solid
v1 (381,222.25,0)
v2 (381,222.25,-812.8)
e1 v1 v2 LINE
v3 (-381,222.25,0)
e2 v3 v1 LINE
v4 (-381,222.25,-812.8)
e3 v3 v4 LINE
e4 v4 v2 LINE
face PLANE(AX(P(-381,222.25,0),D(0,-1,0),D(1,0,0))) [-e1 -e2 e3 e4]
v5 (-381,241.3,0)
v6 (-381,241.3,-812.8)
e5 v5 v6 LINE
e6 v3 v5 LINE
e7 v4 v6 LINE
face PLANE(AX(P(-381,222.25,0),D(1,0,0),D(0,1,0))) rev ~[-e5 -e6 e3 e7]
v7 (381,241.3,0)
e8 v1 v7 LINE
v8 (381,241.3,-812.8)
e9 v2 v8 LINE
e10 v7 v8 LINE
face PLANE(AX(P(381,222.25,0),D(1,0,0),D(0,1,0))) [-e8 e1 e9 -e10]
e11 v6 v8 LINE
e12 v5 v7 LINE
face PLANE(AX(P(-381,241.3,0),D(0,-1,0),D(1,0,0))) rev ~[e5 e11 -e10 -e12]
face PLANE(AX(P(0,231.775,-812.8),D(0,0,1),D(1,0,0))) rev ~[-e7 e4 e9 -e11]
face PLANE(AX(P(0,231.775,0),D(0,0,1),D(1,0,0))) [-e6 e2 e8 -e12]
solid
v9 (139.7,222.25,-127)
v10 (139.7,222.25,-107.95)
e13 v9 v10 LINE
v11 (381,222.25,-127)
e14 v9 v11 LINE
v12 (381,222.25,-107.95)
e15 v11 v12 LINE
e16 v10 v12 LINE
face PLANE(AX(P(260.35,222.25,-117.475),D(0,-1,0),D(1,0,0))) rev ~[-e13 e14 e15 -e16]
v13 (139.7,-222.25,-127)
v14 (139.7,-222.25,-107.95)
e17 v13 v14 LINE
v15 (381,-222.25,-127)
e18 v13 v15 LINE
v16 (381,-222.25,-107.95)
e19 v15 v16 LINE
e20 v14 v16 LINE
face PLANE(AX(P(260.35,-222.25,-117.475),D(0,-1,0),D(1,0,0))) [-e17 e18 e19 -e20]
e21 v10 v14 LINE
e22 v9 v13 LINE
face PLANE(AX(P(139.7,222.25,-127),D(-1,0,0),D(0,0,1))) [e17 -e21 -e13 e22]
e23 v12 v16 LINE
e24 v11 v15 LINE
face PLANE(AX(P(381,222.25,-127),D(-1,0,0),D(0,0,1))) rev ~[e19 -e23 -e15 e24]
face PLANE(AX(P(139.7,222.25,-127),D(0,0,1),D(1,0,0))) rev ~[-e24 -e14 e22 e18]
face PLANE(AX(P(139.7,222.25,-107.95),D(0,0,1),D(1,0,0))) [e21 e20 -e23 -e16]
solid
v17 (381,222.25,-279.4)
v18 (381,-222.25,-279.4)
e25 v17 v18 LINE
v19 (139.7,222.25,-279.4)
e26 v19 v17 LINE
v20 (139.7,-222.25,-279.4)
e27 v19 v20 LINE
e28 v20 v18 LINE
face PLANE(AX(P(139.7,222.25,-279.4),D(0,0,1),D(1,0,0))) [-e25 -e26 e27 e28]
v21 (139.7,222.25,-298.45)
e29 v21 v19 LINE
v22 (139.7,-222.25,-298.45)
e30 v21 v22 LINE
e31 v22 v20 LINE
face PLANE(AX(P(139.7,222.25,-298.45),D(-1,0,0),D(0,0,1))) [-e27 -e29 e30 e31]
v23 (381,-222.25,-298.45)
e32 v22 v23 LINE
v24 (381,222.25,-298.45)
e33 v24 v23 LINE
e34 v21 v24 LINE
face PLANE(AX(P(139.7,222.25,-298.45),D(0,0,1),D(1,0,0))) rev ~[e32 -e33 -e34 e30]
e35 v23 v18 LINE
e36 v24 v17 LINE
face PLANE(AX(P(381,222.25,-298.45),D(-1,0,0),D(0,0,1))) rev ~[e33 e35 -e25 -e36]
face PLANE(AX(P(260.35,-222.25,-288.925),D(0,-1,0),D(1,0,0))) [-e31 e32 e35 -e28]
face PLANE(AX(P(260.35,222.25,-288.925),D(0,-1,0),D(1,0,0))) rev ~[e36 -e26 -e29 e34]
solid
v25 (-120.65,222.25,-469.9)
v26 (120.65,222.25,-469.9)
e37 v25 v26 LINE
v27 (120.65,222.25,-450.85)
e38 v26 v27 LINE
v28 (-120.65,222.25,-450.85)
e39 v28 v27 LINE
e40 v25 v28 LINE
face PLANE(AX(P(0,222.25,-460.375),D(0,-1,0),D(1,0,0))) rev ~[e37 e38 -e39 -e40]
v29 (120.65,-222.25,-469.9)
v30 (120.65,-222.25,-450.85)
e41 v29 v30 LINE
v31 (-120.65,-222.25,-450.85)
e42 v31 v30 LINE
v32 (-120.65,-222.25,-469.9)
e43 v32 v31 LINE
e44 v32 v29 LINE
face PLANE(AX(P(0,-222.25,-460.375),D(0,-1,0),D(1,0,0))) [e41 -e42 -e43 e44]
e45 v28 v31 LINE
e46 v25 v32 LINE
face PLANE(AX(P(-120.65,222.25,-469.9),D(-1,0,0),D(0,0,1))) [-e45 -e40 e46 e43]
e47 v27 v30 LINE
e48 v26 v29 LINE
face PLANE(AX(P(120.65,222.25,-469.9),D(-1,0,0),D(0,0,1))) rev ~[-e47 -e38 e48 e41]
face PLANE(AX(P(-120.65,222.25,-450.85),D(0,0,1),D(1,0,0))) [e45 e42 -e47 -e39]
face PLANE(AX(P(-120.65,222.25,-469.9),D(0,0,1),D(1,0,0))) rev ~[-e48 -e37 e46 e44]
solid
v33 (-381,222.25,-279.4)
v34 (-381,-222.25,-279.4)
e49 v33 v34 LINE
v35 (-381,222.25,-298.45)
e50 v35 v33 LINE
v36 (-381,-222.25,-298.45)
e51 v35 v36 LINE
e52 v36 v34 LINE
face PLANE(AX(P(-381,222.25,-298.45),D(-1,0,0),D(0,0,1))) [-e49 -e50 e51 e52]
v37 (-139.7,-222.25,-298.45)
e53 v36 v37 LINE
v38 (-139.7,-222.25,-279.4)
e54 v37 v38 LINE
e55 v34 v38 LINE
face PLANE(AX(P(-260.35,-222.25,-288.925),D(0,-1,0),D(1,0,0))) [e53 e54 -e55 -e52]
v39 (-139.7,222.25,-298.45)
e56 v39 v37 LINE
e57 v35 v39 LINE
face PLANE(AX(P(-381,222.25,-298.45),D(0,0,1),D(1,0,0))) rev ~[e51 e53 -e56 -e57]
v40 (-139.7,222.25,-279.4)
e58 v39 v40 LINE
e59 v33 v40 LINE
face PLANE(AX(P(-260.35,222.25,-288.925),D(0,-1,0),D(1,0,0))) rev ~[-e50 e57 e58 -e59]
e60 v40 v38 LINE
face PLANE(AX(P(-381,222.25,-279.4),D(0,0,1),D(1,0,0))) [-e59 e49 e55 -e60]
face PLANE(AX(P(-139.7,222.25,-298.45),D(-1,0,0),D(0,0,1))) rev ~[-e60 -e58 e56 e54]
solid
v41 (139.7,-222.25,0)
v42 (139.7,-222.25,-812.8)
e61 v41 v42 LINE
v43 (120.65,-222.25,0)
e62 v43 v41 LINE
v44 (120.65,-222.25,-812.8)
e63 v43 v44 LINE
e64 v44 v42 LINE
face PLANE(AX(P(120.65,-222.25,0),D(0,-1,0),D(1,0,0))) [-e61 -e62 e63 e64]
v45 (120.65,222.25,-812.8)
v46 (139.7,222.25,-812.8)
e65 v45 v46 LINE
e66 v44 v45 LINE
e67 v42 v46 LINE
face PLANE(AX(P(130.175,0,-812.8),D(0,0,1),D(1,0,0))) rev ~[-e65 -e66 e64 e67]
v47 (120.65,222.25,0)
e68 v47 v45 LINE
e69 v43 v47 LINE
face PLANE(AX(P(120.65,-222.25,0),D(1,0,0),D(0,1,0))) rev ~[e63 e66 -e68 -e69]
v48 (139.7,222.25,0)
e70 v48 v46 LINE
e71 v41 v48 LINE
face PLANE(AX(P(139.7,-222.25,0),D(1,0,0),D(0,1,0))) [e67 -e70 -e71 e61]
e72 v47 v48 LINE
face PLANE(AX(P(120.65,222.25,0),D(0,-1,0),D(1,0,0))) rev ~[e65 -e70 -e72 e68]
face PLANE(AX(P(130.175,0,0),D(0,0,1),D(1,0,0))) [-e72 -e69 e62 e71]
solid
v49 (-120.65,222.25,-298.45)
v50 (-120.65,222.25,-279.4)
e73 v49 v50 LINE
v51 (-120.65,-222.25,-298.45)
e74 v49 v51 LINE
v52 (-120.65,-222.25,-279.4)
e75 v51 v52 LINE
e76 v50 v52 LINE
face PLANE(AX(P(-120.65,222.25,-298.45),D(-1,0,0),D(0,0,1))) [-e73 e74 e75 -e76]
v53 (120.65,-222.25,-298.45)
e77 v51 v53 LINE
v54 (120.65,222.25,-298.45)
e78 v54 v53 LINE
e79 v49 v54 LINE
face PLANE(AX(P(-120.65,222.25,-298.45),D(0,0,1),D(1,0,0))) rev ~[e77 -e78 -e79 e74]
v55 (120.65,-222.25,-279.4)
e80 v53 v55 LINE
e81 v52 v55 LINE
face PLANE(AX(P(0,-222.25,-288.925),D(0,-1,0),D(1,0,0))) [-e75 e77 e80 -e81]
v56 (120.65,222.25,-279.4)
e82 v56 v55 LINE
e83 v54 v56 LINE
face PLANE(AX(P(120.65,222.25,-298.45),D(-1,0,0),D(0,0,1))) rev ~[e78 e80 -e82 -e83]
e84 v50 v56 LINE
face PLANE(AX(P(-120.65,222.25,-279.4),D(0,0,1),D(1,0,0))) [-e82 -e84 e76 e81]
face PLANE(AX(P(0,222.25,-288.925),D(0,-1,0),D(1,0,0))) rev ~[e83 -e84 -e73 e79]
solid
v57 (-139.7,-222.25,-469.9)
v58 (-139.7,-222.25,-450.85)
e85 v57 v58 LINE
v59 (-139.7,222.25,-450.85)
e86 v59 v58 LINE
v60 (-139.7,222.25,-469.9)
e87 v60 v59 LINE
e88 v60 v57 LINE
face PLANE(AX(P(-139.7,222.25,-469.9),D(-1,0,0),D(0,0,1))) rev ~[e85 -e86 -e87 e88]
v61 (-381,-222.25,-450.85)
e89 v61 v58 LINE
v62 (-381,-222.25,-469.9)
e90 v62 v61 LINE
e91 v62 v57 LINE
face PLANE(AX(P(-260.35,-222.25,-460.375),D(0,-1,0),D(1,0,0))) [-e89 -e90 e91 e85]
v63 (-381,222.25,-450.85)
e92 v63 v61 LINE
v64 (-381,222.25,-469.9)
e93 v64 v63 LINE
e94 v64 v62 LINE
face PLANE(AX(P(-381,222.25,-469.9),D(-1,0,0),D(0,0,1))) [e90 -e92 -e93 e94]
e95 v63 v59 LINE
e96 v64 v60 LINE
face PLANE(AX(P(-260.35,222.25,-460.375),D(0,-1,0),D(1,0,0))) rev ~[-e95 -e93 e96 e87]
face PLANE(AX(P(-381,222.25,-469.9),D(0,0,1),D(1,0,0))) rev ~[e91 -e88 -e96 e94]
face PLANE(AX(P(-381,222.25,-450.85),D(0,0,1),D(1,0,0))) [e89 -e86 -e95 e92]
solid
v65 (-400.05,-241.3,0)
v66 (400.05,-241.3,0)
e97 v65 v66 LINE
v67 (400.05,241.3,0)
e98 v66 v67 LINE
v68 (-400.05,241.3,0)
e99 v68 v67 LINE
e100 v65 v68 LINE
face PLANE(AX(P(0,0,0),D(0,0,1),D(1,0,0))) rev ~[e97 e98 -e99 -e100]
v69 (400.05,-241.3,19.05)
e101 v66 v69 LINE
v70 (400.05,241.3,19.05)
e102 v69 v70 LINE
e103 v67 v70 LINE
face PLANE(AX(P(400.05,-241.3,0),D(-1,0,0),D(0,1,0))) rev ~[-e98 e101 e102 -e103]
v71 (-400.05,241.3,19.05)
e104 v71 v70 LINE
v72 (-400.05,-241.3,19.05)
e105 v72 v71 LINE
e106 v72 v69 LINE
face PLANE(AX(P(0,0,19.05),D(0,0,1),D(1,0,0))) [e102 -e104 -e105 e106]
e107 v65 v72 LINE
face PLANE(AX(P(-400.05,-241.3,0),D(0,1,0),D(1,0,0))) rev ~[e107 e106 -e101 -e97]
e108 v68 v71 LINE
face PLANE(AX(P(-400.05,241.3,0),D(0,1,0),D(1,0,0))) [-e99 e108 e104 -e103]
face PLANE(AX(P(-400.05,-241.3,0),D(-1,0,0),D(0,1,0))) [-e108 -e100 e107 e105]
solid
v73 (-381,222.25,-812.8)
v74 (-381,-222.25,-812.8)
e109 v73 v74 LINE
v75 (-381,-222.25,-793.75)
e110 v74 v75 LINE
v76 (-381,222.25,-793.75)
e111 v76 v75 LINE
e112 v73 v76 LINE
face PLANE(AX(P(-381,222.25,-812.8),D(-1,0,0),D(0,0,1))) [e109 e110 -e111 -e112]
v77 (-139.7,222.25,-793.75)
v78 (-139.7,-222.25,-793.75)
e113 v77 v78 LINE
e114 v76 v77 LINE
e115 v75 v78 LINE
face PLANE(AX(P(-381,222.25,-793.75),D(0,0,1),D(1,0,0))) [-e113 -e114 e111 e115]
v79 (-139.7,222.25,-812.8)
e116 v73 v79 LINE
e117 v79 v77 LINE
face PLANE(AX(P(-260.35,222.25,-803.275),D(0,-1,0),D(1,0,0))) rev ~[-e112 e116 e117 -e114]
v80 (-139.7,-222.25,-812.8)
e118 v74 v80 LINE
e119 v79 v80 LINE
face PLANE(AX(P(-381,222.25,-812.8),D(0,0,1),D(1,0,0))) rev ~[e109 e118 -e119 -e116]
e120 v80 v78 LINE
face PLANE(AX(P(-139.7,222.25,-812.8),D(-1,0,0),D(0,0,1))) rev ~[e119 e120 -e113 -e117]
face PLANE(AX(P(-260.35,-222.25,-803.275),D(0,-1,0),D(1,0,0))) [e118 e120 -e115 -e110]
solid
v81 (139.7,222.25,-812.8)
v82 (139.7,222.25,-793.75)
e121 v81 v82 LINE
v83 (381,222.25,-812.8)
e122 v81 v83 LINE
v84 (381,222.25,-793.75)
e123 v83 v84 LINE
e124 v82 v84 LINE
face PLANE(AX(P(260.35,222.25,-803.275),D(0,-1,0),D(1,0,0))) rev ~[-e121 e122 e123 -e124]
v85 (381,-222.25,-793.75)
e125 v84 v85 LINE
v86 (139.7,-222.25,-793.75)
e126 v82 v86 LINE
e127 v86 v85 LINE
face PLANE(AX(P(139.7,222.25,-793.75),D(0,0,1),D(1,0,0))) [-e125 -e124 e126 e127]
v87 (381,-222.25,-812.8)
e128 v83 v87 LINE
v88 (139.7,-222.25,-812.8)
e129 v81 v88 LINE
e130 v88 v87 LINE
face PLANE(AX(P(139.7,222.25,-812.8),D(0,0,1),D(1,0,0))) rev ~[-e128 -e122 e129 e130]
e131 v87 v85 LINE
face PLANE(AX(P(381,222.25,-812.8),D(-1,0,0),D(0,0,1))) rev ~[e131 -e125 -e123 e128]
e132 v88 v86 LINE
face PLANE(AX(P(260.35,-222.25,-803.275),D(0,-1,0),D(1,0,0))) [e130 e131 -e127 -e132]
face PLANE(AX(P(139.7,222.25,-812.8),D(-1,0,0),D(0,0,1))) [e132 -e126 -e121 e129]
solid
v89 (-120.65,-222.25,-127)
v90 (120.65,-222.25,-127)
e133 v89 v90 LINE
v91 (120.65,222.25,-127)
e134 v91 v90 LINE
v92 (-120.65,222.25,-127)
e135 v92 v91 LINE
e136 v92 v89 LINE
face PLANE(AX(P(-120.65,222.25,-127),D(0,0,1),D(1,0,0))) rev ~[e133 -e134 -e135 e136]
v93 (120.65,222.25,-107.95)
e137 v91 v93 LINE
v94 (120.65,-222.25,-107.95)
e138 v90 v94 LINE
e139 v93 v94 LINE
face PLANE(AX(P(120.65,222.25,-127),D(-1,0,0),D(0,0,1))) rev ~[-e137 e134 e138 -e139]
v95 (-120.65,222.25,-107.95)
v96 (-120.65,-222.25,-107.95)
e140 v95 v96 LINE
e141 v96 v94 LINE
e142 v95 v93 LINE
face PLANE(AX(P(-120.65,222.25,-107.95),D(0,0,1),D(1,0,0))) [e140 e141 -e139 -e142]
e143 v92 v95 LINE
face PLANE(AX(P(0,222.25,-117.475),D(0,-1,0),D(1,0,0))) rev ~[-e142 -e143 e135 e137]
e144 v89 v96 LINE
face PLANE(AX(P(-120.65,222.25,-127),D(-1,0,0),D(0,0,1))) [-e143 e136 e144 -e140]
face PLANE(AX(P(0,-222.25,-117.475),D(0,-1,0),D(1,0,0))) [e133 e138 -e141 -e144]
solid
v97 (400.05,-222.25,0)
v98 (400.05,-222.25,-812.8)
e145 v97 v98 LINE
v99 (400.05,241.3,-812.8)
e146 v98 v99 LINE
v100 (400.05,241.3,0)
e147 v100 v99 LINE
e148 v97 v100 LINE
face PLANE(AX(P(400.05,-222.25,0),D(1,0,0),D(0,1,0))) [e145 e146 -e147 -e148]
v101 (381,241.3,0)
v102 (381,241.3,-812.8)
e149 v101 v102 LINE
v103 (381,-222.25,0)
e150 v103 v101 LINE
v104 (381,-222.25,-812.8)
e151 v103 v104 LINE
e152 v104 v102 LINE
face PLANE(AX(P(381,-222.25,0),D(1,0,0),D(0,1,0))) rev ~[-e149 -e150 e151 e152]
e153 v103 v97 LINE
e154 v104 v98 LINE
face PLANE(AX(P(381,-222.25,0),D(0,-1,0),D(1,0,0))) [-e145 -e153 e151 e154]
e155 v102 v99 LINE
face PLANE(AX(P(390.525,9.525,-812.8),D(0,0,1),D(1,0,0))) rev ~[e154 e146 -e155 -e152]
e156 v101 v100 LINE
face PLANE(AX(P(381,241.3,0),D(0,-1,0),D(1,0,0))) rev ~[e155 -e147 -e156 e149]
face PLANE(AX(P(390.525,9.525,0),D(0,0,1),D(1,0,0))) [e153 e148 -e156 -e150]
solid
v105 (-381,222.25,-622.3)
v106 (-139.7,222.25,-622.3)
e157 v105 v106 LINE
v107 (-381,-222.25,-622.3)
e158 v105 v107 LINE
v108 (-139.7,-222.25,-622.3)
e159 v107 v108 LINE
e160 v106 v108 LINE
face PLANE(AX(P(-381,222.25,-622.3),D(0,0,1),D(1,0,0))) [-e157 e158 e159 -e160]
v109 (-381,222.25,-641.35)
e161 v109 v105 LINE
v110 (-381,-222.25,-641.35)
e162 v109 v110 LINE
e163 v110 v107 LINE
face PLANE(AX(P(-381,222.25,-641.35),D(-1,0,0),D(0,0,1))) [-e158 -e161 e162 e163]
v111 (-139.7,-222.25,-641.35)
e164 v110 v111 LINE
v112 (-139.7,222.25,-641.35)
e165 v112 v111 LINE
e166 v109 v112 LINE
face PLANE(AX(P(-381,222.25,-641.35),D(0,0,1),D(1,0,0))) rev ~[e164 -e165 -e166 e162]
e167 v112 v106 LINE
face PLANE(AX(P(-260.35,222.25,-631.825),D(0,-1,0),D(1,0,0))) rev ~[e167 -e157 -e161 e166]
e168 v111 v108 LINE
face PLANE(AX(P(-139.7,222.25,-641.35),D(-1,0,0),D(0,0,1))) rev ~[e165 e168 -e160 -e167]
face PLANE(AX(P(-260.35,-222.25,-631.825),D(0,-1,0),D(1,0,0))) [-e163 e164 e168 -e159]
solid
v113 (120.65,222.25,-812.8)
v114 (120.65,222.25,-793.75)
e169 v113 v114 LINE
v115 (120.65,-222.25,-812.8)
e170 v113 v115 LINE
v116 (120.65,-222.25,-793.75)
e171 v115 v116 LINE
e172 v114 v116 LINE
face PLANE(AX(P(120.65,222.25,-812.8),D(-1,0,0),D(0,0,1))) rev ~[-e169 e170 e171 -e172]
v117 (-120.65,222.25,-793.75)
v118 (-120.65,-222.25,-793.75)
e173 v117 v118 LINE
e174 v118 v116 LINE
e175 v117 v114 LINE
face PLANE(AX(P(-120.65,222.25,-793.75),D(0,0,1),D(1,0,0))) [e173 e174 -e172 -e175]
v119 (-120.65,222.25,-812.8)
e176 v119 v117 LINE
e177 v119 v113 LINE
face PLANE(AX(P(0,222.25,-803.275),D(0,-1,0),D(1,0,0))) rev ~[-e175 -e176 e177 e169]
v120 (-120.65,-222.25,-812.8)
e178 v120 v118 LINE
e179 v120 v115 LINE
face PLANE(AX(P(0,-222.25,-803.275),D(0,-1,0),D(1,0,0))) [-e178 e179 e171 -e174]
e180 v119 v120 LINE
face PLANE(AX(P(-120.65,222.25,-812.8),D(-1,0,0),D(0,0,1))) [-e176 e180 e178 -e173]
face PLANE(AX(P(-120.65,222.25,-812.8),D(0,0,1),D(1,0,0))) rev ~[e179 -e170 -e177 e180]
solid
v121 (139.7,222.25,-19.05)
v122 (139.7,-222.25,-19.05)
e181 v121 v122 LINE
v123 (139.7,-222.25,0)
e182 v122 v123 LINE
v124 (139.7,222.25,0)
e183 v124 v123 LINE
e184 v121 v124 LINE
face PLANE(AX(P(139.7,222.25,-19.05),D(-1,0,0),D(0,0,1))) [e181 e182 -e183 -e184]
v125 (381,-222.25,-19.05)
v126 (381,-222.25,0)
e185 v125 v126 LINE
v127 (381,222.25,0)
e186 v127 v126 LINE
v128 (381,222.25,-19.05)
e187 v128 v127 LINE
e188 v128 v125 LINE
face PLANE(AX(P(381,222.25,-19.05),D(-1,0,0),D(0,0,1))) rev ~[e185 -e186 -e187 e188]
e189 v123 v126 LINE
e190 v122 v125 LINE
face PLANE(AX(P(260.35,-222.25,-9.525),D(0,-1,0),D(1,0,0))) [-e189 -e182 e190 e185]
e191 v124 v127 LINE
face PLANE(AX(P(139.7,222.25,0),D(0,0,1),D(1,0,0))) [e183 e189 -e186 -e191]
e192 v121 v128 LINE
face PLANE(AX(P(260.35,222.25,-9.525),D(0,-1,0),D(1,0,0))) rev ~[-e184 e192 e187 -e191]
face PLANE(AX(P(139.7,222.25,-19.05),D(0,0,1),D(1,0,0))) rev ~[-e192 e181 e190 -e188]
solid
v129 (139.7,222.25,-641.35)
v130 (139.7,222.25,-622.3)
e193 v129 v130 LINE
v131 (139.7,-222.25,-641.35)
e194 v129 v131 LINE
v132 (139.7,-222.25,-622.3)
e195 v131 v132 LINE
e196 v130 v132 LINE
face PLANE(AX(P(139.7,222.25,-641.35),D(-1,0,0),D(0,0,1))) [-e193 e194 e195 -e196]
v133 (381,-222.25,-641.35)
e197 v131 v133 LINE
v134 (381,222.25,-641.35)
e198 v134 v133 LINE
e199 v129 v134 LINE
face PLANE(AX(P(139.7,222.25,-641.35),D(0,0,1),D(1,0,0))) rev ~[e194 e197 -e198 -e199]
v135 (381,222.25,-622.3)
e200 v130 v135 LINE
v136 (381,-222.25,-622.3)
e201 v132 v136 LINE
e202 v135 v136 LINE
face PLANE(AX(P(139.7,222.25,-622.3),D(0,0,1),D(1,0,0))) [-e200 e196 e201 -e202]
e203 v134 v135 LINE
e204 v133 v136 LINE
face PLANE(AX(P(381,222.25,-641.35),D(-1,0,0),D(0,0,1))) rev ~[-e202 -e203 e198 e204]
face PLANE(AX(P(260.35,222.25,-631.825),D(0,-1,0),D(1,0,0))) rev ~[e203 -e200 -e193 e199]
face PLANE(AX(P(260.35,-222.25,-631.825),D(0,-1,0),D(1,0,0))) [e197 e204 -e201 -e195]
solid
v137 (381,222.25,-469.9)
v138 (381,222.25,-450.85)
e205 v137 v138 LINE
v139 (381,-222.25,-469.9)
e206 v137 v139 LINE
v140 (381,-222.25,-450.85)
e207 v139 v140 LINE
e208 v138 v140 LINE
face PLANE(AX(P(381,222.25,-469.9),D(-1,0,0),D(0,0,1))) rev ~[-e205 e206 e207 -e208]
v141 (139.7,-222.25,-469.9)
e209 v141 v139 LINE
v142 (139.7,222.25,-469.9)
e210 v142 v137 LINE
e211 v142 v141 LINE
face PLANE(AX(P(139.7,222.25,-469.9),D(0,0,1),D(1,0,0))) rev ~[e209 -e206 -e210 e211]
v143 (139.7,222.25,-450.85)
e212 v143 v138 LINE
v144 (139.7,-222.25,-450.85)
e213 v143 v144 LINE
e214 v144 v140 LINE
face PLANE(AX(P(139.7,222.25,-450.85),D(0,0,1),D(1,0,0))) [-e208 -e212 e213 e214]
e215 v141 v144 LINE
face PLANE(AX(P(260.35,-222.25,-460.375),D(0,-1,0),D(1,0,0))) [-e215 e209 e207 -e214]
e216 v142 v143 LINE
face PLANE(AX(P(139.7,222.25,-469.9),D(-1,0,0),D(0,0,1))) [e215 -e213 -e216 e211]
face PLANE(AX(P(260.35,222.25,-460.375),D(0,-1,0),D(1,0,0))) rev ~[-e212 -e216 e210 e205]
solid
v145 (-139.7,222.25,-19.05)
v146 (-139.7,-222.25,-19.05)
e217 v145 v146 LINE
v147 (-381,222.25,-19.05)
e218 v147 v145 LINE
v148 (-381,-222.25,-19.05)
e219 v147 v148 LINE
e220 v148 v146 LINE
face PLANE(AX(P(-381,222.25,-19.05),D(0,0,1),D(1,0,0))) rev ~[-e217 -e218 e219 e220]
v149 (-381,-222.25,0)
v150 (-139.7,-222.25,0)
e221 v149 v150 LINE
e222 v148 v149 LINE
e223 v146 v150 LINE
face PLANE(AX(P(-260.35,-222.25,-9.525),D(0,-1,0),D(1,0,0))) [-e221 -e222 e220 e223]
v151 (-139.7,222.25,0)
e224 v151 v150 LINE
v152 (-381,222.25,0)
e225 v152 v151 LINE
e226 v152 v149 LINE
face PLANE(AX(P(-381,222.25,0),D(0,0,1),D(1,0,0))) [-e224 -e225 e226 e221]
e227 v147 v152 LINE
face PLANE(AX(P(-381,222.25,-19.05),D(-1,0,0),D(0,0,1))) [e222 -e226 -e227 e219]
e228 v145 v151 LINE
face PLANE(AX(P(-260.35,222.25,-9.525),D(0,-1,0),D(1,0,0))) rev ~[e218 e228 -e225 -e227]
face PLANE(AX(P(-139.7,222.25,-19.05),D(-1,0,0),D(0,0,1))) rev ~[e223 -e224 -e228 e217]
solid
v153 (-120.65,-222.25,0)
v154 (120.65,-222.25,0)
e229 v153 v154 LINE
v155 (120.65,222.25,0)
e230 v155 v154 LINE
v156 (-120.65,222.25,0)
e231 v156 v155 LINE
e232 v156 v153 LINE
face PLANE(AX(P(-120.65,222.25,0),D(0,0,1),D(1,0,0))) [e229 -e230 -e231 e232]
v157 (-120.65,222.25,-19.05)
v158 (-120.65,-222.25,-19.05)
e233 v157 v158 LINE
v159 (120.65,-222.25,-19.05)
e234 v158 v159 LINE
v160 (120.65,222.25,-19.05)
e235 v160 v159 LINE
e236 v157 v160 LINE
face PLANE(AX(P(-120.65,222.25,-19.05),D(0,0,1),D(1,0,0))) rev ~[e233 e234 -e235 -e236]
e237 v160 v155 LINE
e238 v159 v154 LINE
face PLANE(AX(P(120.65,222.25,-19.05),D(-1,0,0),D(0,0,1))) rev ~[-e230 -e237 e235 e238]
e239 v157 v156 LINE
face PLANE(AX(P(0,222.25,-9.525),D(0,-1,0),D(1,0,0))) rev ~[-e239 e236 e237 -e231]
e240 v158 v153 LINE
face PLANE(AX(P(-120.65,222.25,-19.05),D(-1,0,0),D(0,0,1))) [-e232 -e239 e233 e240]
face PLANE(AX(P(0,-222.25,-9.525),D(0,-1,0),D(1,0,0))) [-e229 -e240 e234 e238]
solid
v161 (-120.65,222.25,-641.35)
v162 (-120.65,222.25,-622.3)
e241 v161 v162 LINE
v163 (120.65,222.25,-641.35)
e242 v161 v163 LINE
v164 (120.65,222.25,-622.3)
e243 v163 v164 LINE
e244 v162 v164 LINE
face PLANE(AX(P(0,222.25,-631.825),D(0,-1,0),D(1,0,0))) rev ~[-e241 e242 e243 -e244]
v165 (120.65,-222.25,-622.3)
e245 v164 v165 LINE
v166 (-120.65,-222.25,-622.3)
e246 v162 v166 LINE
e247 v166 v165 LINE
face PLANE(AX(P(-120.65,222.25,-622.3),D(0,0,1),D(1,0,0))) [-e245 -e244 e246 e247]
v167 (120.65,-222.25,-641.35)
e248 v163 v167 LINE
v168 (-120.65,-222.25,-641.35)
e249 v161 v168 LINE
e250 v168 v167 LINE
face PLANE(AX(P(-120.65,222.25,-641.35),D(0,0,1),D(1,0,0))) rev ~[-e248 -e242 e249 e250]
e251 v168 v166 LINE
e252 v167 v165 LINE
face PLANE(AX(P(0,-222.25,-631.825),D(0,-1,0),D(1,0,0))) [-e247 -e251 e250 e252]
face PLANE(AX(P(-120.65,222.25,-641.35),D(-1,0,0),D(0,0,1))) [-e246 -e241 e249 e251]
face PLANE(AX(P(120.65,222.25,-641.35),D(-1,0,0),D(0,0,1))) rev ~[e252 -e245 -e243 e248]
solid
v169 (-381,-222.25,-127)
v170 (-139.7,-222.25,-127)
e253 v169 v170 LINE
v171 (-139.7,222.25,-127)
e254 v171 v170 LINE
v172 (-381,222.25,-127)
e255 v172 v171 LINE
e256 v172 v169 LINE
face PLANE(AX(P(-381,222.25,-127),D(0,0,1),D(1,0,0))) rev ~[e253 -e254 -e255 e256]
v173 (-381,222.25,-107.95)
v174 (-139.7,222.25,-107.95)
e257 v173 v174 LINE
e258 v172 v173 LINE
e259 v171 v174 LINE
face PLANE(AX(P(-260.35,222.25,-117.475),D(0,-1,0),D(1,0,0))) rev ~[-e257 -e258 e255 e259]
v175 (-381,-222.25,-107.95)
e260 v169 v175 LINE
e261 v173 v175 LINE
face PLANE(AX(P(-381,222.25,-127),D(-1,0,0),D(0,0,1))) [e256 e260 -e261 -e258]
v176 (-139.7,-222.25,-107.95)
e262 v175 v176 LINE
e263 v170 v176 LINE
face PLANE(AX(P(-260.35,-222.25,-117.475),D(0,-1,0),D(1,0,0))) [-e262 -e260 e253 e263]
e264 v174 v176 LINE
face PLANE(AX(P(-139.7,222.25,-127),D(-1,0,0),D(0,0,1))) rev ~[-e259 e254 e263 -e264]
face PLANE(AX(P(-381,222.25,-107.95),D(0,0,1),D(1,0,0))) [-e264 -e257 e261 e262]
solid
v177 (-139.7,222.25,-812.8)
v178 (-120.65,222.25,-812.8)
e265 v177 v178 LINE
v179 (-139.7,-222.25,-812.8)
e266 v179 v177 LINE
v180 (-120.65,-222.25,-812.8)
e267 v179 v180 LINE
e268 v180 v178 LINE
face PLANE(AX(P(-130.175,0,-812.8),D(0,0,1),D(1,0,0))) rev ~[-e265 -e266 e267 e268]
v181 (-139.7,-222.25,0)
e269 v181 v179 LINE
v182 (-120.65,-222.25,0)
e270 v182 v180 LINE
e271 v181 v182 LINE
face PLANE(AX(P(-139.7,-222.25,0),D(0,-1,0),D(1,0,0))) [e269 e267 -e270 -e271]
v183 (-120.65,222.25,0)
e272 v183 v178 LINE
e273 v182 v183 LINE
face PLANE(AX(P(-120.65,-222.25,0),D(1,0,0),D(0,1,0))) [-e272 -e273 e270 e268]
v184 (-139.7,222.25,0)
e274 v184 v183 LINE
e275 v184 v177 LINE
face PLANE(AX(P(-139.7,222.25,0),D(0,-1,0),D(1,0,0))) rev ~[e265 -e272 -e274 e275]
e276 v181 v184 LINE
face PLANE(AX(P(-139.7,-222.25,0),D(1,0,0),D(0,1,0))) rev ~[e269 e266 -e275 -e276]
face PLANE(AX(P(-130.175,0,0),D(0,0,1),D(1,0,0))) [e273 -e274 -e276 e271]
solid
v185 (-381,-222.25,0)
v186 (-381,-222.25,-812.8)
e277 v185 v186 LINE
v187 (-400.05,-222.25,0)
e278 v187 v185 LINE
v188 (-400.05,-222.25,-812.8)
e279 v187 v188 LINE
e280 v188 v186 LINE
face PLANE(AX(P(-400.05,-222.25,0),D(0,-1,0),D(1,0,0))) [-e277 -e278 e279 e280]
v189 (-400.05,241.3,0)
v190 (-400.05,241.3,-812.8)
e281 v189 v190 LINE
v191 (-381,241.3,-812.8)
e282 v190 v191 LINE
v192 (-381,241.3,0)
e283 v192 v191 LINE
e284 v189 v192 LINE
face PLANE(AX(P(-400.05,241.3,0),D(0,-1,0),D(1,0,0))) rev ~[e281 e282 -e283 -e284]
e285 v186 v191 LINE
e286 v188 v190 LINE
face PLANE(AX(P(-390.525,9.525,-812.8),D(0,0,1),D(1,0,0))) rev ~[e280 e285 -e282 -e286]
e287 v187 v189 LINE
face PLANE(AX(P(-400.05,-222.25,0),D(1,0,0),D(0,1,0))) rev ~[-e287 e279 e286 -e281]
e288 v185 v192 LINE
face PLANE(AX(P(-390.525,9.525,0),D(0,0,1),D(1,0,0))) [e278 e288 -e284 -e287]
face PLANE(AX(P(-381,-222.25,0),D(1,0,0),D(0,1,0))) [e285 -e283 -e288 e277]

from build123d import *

# Parameters (mm, degrees)
F1_W      = 800.1
F1_H      = 482.6
F2_DEPTH  = 19.05
F3_W      = 19.05
F3_H      = 463.55
F4_DEPTH  = 812.8
F5_W      = 762
F5_H      = 19.05
F6_DEPTH  = 812.8
F7_W      = 19.05
F7_H      = 444.5
F8_DEPTH  = 812.8
F9_W      = 241.3
F9_H      = 19.05
F10_DEPTH = 444.5


# Not quite as in the source:
# - a variable given as a bare number and used for a length is read in inches; the dataset says mm whatever the document's units were


with BuildPart() as f2:
    # F1 (on Top) → F2 (new body)
    with BuildSketch(Plane.XY):
        Rectangle(F1_W, F1_H)
    extrude(amount=F2_DEPTH)


with BuildPart() as f4:
    # F3 (on face) → F4 (new body)
    with BuildSketch(Plane.XY):
        with Locations((-390.525, 9.525)):
            Rectangle(F3_W, F3_H)
    extrude(amount=-F4_DEPTH)


with BuildPart() as f4b:
    # F3 (on face) → F4, piece 2 (new body)
    with BuildSketch(Plane.XY):
        with Locations((390.525, 9.525)):
            Rectangle(F3_W, F3_H)
    extrude(amount=-F4_DEPTH)


with BuildPart() as f6:
    # F5 (on face) → F6 (new body)
    with BuildSketch(Plane.XY):
        with Locations((0, 231.775)):
            Rectangle(F5_W, F5_H)
    extrude(amount=-F6_DEPTH)


with BuildPart() as f8:
    # F7 (on face) → F8 (new body)
    with BuildSketch(Plane.XY):
        with Locations((-130.175, 0)):
            Rectangle(F7_W, F7_H)
    extrude(amount=-F8_DEPTH)


with BuildPart() as f8b:
    # F7 (on face) → F8, piece 2 (new body)
    with BuildSketch(Plane.XY):
        with Locations((130.175, 0)):
            Rectangle(F7_W, F7_H)
    extrude(amount=-F8_DEPTH)


with BuildPart() as f10:
    # F9 (on face) → F10 (new body, through all)
    with BuildSketch(Plane.XZ.offset(-222.25)):
        with Locations((-260.35, -9.525)):
            Rectangle(F9_W, F9_H)
    extrude(amount=F10_DEPTH)


with BuildPart() as f10b:
    # F9 (on face) → F10, piece 2 (new body, through all)
    with BuildSketch(Plane.XZ.offset(-222.25)):
        with Locations((260.35, -9.525)):
            Rectangle(F9_W, F9_H)
    extrude(amount=F10_DEPTH)


with BuildPart() as f10c:
    # F9 (on face) → F10, piece 3 (new body, through all)
    with BuildSketch(Plane.XZ.offset(-222.25)):
        with Locations((0, -9.525)):
            Rectangle(F9_W, F9_H)
    extrude(amount=F10_DEPTH)


with BuildPart() as f10d:
    # F9 (on face) → F10, piece 4 (new body, through all)
    with BuildSketch(Plane.XZ.offset(-222.25)):
        with Locations((-260.35, -803.275)):
            Rectangle(F9_W, F9_H)
    extrude(amount=F10_DEPTH)


with BuildPart() as f10e:
    # F9 (on face) → F10, piece 5 (new body, through all)
    with BuildSketch(Plane.XZ.offset(-222.25)):
        with Locations((260.35, -803.275)):
            Rectangle(F9_W, F9_H)
    extrude(amount=F10_DEPTH)


with BuildPart() as f10f:
    # F9 (on face) → F10, piece 6 (new body, through all)
    with BuildSketch(Plane.XZ.offset(-222.25)):
        with Locations((0, -803.275)):
            Rectangle(F9_W, F9_H)
    extrude(amount=F10_DEPTH)


with BuildPart() as f10g:
    # F9 (on face) → F10, piece 7 (new body, through all)
    with BuildSketch(Plane.XZ.offset(-222.25)):
        with Locations((260.35, -631.825)):
            Rectangle(F9_W, F9_H)
    extrude(amount=F10_DEPTH)


with BuildPart() as f10h:
    # F9 (on face) → F10, piece 8 (new body, through all)
    with BuildSketch(Plane.XZ.offset(-222.25)):
        with Locations((-260.35, -631.825)):
            Rectangle(F9_W, F9_H)
    extrude(amount=F10_DEPTH)


with BuildPart() as f10i:
    # F9 (on face) → F10, piece 9 (new body, through all)
    with BuildSketch(Plane.XZ.offset(-222.25)):
        with Locations((0, -631.825)):
            Rectangle(F9_W, F9_H)
    extrude(amount=F10_DEPTH)


with BuildPart() as f10j:
    # F9 (on face) → F10, piece 10 (new body, through all)
    with BuildSketch(Plane.XZ.offset(-222.25)):
        with Locations((260.35, -460.375)):
            Rectangle(F9_W, F9_H)
    extrude(amount=F10_DEPTH)


with BuildPart() as f10k:
    # F9 (on face) → F10, piece 11 (new body, through all)
    with BuildSketch(Plane.XZ.offset(-222.25)):
        with Locations((-260.35, -460.375)):
            Rectangle(F9_W, F9_H)
    extrude(amount=F10_DEPTH)


with BuildPart() as f10l:
    # F9 (on face) → F10, piece 12 (new body, through all)
    with BuildSketch(Plane.XZ.offset(-222.25)):
        with Locations((0, -460.375)):
            Rectangle(F9_W, F9_H)
    extrude(amount=F10_DEPTH)


with BuildPart() as f10m:
    # F9 (on face) → F10, piece 13 (new body, through all)
    with BuildSketch(Plane.XZ.offset(-222.25)):
        with Locations((260.35, -288.925)):
            Rectangle(F9_W, F9_H)
    extrude(amount=F10_DEPTH)


with BuildPart() as f10n:
    # F9 (on face) → F10, piece 14 (new body, through all)
    with BuildSketch(Plane.XZ.offset(-222.25)):
        with Locations((-260.35, -288.925)):
            Rectangle(F9_W, F9_H)
    extrude(amount=F10_DEPTH)


with BuildPart() as f10o:
    # F9 (on face) → F10, piece 15 (new body, through all)
    with BuildSketch(Plane.XZ.offset(-222.25)):
        with Locations((0, -288.925)):
            Rectangle(F9_W, F9_H)
    extrude(amount=F10_DEPTH)


with BuildPart() as f10p:
    # F9 (on face) → F10, piece 16 (new body, through all)
    with BuildSketch(Plane.XZ.offset(-222.25)):
        with Locations((260.35, -117.475)):
            Rectangle(F9_W, F9_H)
    extrude(amount=F10_DEPTH)


with BuildPart() as f10q:
    # F9 (on face) → F10, piece 17 (new body, through all)
    with BuildSketch(Plane.XZ.offset(-222.25)):
        with Locations((-260.35, -117.475)):
            Rectangle(F9_W, F9_H)
    extrude(amount=F10_DEPTH)


with BuildPart() as f10r:
    # F9 (on face) → F10, piece 18 (new body, through all)
    with BuildSketch(Plane.XZ.offset(-222.25)):
        with Locations((0, -117.475)):
            Rectangle(F9_W, F9_H)
    extrude(amount=F10_DEPTH)


solid = Compound([f2.part, f4.part, f4b.part, f6.part, f8.part, f8b.part, f10.part, f10b.part, f10c.part, f10d.part, f10e.part, f10f.part, f10g.part, f10h.part, f10i.part, f10j.part, f10k.part, f10l.part, f10m.part, f10n.part, f10o.part, f10p.part, f10q.part, f10r.part])
